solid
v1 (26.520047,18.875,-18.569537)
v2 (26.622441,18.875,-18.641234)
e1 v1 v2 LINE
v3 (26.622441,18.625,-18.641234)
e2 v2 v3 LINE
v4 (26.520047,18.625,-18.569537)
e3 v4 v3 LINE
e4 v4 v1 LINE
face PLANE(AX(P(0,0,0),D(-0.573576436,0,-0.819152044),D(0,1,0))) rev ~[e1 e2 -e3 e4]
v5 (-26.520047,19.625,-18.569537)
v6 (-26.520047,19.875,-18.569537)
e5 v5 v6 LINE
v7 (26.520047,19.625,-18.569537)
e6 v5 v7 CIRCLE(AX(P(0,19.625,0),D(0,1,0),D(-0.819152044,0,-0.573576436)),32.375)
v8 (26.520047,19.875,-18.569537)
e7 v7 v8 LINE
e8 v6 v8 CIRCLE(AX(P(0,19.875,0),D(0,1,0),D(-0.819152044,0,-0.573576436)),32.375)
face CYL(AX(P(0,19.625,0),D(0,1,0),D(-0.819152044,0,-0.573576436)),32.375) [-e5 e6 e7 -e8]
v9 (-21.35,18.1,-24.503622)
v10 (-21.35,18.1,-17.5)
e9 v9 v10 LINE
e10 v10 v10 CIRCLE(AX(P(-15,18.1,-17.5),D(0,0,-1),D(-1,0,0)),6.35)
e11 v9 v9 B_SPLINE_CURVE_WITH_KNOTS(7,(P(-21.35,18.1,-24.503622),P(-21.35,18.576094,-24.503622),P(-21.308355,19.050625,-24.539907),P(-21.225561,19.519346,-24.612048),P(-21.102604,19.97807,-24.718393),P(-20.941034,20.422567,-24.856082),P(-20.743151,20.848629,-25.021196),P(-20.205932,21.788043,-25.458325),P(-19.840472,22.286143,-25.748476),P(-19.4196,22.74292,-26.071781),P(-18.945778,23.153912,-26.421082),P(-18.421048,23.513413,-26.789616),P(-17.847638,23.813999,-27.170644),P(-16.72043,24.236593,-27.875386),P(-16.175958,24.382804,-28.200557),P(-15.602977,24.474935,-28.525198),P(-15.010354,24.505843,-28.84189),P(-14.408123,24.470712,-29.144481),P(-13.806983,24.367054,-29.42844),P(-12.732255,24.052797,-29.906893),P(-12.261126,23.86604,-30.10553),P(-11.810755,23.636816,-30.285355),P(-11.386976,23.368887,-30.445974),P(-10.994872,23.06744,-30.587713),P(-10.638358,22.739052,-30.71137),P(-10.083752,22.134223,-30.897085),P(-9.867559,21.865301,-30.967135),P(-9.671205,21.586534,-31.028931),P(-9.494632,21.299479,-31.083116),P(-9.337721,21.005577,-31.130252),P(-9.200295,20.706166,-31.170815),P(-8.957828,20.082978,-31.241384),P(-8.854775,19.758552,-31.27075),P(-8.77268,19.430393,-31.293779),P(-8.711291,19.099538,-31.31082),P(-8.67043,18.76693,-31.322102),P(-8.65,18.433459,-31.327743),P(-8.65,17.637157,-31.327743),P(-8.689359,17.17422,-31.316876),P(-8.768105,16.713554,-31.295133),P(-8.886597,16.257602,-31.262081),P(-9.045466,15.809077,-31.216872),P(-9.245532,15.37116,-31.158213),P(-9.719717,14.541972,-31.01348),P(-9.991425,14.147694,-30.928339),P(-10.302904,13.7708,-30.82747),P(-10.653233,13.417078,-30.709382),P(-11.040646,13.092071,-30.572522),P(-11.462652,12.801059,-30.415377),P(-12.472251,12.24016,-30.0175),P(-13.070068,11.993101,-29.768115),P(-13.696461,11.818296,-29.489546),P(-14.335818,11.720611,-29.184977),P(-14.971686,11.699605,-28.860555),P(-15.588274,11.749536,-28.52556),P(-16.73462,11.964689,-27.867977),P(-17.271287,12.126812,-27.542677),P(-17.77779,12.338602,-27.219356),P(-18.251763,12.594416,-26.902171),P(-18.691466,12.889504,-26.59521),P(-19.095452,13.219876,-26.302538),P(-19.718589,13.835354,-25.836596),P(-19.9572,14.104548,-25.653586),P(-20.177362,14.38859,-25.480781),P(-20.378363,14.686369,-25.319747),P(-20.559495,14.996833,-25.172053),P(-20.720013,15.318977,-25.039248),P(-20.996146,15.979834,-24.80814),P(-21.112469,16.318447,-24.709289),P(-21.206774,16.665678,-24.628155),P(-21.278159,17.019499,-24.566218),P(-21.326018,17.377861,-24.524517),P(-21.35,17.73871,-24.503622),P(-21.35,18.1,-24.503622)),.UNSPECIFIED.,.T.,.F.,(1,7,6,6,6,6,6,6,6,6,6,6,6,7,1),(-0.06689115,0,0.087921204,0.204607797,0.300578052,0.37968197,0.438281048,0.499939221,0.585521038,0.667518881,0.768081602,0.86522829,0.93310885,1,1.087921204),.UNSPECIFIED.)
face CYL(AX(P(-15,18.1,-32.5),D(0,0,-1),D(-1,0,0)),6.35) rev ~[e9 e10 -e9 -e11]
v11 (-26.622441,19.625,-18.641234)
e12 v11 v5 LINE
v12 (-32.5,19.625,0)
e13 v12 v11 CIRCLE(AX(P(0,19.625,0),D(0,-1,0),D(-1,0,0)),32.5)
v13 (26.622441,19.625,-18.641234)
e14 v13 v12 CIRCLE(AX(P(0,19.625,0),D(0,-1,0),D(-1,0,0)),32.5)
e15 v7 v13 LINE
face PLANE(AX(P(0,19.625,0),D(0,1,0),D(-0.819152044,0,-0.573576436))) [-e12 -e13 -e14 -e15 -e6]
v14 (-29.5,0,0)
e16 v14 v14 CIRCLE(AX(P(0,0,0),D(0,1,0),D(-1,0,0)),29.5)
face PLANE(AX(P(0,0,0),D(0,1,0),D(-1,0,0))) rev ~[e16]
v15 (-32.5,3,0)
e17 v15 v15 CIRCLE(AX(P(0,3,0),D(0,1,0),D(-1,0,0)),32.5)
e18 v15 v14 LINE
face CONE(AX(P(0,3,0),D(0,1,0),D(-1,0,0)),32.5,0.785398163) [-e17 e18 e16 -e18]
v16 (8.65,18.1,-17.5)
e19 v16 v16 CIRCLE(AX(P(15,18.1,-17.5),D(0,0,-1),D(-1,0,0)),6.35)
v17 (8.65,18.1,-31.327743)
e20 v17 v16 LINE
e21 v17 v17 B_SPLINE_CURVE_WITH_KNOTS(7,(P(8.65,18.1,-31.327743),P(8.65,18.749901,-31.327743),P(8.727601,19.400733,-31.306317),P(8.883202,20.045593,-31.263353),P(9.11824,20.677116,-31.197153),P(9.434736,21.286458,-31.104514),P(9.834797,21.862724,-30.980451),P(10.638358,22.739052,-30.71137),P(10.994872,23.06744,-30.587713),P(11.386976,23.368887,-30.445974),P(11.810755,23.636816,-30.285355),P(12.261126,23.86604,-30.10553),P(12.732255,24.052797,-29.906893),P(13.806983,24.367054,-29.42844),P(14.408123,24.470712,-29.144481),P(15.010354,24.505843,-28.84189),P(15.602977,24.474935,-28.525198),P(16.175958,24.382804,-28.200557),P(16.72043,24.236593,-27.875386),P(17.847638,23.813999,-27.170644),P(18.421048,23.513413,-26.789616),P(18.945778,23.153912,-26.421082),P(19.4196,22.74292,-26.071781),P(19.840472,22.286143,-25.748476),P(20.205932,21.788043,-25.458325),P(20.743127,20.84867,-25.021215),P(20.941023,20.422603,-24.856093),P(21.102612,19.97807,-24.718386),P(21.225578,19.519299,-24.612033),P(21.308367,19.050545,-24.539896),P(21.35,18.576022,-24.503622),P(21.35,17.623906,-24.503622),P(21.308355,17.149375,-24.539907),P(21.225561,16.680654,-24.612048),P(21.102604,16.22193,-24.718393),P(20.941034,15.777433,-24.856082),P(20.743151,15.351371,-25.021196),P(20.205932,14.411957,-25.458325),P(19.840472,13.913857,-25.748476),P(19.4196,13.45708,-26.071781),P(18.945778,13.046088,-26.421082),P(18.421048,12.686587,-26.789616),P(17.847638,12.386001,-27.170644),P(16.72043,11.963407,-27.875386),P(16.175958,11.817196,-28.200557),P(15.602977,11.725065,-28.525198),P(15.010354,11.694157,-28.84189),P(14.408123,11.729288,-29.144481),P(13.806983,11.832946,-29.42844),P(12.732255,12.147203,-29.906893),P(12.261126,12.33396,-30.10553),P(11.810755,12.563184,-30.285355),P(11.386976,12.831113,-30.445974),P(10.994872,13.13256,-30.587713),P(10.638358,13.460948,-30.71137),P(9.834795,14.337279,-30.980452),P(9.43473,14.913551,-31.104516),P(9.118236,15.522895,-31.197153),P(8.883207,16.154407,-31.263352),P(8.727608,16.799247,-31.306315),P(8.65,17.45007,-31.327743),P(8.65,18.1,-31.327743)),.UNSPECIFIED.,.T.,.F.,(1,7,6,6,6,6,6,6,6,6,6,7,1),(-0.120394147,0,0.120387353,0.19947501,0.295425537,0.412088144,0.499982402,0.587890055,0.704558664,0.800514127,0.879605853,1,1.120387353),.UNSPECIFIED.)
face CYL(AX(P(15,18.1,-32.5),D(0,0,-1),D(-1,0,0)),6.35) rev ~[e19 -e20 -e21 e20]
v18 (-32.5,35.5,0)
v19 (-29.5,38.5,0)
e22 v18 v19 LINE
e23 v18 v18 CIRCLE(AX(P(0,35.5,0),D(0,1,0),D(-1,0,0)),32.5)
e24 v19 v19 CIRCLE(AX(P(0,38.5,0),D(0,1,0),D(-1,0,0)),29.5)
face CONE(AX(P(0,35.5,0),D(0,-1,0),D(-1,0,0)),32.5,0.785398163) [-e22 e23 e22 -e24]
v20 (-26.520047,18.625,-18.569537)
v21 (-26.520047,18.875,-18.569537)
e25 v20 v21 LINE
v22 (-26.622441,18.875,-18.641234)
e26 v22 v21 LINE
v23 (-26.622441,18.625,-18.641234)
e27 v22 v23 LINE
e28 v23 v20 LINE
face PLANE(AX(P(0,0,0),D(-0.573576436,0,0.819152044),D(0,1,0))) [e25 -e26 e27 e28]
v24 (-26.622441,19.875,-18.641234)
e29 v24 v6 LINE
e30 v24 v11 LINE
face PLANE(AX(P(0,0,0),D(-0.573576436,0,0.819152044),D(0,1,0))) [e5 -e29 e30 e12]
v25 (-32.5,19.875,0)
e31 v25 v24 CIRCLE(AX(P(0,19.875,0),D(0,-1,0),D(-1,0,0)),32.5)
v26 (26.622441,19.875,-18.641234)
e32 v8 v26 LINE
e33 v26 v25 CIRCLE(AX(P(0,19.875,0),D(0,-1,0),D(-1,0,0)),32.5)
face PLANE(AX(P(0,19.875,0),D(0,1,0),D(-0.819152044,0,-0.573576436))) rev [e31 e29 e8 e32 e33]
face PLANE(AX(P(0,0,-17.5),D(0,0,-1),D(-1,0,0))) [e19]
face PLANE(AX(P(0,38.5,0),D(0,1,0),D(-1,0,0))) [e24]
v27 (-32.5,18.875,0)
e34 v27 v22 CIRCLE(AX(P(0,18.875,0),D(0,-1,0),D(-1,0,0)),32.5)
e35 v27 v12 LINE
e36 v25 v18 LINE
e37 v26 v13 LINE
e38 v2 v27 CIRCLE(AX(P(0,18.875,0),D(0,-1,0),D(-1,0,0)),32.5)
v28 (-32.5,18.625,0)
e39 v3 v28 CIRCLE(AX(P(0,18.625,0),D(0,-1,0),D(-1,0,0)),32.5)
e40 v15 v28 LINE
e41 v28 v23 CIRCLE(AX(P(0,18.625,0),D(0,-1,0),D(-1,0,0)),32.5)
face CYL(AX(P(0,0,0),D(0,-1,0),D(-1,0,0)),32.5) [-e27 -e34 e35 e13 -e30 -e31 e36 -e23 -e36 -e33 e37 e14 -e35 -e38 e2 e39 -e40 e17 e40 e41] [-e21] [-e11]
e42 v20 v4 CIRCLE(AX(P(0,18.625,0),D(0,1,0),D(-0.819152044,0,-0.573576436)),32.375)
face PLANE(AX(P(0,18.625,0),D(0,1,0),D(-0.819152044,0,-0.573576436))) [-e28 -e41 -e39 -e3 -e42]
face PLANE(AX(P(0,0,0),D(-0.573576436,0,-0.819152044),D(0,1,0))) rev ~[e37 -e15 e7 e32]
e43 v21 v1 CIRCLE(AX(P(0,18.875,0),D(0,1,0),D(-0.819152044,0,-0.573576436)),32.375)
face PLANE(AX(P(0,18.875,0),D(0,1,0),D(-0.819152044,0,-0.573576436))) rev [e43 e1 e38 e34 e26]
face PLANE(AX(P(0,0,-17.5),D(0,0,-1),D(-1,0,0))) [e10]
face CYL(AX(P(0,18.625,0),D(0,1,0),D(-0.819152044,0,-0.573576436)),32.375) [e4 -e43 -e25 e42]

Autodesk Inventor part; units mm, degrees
ref_plane "YZ Plane" through (0, 0, 0) normal (1, 0, 0) x (0, 1, 0)
ref_plane "XZ Plane" through (0, 0, 0) normal (0, 1, 0) x (-1, 0, 0)
sketch "Sketch1" plane through (0, 0, 0) normal (0, 1, 0) x (-1, 0, 0)
  circle A0 centre (0, 0) radius 32.5
  dimension "d0" = 65
extrude "Extrusion1" add sketch "Sketch1" along normal blind 38.5
sketch "Sketch2" plane through (0, 0, 0) normal (0, -1, 0) x (1, 0, 0)
  circle A0 centre (0, 0) radius 25.5
  dimension "d3" = 51
extrude "Extrusion2" add sketch "Sketch2" along normal blind 23.4
chamfer "Chamfer1" distance 3 angle 45 2 edges at (32.5, 38.5, 0) (32.5, 0, 0)
sketch "Sketch3" plane through (0, -23.4, 0) normal (0, -1, 0) x (1, 0, 0)
  line L0 (0, 0) -> (0, -10.5) construction
  circle A0 centre (0, 0) radius 25.5 projected
  line L1 (0, -10.5) -> (5.75, -10.5)
  line L2 (5.75, -10.5) -> (5.75, -24.8433)
  line L3 (0, -10.5) -> (-5.75, -10.5)
  line L4 (-5.75, -10.5) -> (-5.75, -24.8433)
  line L5 (5.75, -24.8433) -> (-5.75, -24.8433)
  line L6 (-15, 15) -> (15, 15) construction
  line L7 (15, 15) -> (15, -15) construction
  line L8 (15, -15) -> (-15, -15) construction
  line L9 (-15, -15) -> (-15, 15) construction
  line L10 (-15, 15) -> (15, -15) construction
  line L11 (15, 15) -> (-15, -15) construction
  line L12 (5.65, 5.65) -> (-5.65, 5.65) construction
  line L13 (-5.65, 5.65) -> (-5.65, -5.65) construction
  line L14 (-5.65, -5.65) -> (5.65, -5.65) construction
  line L15 (5.65, -5.65) -> (5.65, 5.65) construction
  line L16 (5.65, 5.65) -> (-5.65, -5.65) construction
  line L17 (-5.65, 5.65) -> (5.65, -5.65) construction
  dimension "d10" = 10.5
  dimension "d14" = 5.75
  dimension "d15" = 5.75
  dimension "d16" = 30
  dimension "d17" = 30
  dimension "d35" = 11.3
  dimension "d36" = 11.3
hole "Hole1" at (15, -23.4, -15) at (-15, -23.4, -15) at (15, -23.4, 15) at (-15, -23.4, 15) direction (0, 1, 0) diameter 2.5 depth 4 tip angle 118
thread "Thread1" size "M2.5x0.45" class "6H" standard "ANSI Metric M Profile" full length
thread "Thread2" size "M2.5x0.45" class "6H" standard "ANSI Metric M Profile" full length
thread "Thread3" size "M2.5x0.45" class "6H" standard "ANSI Metric M Profile" full length
thread "Thread4" size "M2.5x0.45" class "6H" standard "ANSI Metric M Profile" full length
extrude "Extrusion3" cut sketch "Sketch3" against normal blind 12 contours L5 A0 | L4 L3 L1 L2 L5
hole "Hole2" at (5.65, -23.4, 5.65) at (5.65, -23.4, -5.65) at (-5.65, -23.4, 5.65) at (-5.65, -23.4, -5.65) direction (0, 1, 0) diameter 2.1 depth 3 tip angle 118
thread "Thread5" size "M2.5x0.45" class "6H" standard "ANSI Metric M Profile" full length
thread "Thread6" size "M2.2x0.45" class "6H" standard "ANSI Metric M Profile" full length
thread "Thread7" size "M2.2x0.45" class "6H" standard "ANSI Metric M Profile" full length
thread "Thread8" size "M2.2x0.45" class "6H" standard "ANSI Metric M Profile" full length
ref_plane "Work Plane1" through (0, 0, -32.5) normal (0, 0, -1) x (-1, 0, 0)
sketch "Sketch4" plane through (0, 0, -32.5) normal (0, 0, -1) x (-1, 0, 0)
  line L0 (-25.5, -23.4) -> (25.5, -23.4) projected
  line L1 (-32.5, 3) -> (32.5, 3) projected
  line L2 (32.5, 35.5) -> (-32.5, 35.5) projected
  line L3 (0, -23.4) -> (0, 18.1) construction
  line L4 (32.5, 3) -> (32.5, 35.5) projected
  line L5 (-32.5, 3) -> (-32.5, 35.5) projected
  line L6 (32.5, 17.6) -> (32.5, 18.6)
  line L7 (-20, 18.1) -> (20, 18.1) construction
  line L8 (0, 18.1) -> (-15, 18.1)
  line L9 (0, 18.1) -> (15, 18.1)
  circle A0 centre (-15, 18.1) radius 6.35
  circle A1 centre (15, 18.1) radius 6.35
  point P0 (0, 0)
  point P1 (-5.75, -23.4)
  point P2 (5.75, -23.4)
  dimension "d52" = 41.5
  dimension "d53" = 1
  dimension "d54" = 20
  dimension "d56" = 15
  dimension "d57" = 15
  dimension "d58" = 12.7
  dimension "d59" = 12.7
extrude "Extrusion5" cut sketch "Sketch4" against normal blind 15 contours A0 | A1
sketch "Sketch6" plane through (0, 0, 0) normal (1, 0, 0) x (0, 1, 0)
  line L0 (3, 32.5) -> (35.5, 32.5) projected
  line L1 (35.5, 32.5) -> (19.25, 32.5)
  line L2 (19.25, 32.5) -> (19.75, 32.5)
  line L3 (19.25, 32.5) -> (18.75, 32.5)
  line L4 (18.875, 32.625) -> (18.625, 32.625)
  line L5 (18.625, 32.625) -> (18.625, 32.375)
  line L6 (18.625, 32.375) -> (18.875, 32.375)
  line L7 (18.875, 32.375) -> (18.875, 32.625)
  line L8 (18.875, 32.625) -> (18.625, 32.375) construction
  line L9 (18.625, 32.625) -> (18.875, 32.375) construction
  line L10 (19.875, 32.625) -> (19.625, 32.625)
  line L11 (19.625, 32.625) -> (19.625, 32.375)
  line L12 (19.625, 32.375) -> (19.875, 32.375)
  line L13 (19.875, 32.375) -> (19.875, 32.625)
  line L14 (19.875, 32.625) -> (19.625, 32.375) construction
  line L15 (19.625, 32.625) -> (19.875, 32.375) construction
  line L16 (-35.78, 0) -> (50.88, 0) projected
  point P0 (0, 0)
  dimension "d83" = 16.25
  dimension "d84" = 0.5
  dimension "d85" = 0.5
  dimension "d86" = 0.25
  dimension "d87" = 0.25
  dimension "d88" = 0.25
  dimension "d89" = 0.25
revolve "Revolution4" cut sketch "Sketch6" angle 250 mid plane about axis through (0, -10, 0) along (0, 1, 0)
ref_plane "Work Plane2" through (0, 0, 0) normal (0, -1, 0) x (1, 0, 0)
split body "Split1" result two bodies by plane through (0, 0, 0) normal (0, -1, 0) first body at (-14.161, -15.6, -20.6026)
split "Split2" plane through (0, 0, 0) removes the side toward (0, -1, 0)
properties part number "SweepV0.991_HEAD_Rev.1" material "LCP Plastic"
